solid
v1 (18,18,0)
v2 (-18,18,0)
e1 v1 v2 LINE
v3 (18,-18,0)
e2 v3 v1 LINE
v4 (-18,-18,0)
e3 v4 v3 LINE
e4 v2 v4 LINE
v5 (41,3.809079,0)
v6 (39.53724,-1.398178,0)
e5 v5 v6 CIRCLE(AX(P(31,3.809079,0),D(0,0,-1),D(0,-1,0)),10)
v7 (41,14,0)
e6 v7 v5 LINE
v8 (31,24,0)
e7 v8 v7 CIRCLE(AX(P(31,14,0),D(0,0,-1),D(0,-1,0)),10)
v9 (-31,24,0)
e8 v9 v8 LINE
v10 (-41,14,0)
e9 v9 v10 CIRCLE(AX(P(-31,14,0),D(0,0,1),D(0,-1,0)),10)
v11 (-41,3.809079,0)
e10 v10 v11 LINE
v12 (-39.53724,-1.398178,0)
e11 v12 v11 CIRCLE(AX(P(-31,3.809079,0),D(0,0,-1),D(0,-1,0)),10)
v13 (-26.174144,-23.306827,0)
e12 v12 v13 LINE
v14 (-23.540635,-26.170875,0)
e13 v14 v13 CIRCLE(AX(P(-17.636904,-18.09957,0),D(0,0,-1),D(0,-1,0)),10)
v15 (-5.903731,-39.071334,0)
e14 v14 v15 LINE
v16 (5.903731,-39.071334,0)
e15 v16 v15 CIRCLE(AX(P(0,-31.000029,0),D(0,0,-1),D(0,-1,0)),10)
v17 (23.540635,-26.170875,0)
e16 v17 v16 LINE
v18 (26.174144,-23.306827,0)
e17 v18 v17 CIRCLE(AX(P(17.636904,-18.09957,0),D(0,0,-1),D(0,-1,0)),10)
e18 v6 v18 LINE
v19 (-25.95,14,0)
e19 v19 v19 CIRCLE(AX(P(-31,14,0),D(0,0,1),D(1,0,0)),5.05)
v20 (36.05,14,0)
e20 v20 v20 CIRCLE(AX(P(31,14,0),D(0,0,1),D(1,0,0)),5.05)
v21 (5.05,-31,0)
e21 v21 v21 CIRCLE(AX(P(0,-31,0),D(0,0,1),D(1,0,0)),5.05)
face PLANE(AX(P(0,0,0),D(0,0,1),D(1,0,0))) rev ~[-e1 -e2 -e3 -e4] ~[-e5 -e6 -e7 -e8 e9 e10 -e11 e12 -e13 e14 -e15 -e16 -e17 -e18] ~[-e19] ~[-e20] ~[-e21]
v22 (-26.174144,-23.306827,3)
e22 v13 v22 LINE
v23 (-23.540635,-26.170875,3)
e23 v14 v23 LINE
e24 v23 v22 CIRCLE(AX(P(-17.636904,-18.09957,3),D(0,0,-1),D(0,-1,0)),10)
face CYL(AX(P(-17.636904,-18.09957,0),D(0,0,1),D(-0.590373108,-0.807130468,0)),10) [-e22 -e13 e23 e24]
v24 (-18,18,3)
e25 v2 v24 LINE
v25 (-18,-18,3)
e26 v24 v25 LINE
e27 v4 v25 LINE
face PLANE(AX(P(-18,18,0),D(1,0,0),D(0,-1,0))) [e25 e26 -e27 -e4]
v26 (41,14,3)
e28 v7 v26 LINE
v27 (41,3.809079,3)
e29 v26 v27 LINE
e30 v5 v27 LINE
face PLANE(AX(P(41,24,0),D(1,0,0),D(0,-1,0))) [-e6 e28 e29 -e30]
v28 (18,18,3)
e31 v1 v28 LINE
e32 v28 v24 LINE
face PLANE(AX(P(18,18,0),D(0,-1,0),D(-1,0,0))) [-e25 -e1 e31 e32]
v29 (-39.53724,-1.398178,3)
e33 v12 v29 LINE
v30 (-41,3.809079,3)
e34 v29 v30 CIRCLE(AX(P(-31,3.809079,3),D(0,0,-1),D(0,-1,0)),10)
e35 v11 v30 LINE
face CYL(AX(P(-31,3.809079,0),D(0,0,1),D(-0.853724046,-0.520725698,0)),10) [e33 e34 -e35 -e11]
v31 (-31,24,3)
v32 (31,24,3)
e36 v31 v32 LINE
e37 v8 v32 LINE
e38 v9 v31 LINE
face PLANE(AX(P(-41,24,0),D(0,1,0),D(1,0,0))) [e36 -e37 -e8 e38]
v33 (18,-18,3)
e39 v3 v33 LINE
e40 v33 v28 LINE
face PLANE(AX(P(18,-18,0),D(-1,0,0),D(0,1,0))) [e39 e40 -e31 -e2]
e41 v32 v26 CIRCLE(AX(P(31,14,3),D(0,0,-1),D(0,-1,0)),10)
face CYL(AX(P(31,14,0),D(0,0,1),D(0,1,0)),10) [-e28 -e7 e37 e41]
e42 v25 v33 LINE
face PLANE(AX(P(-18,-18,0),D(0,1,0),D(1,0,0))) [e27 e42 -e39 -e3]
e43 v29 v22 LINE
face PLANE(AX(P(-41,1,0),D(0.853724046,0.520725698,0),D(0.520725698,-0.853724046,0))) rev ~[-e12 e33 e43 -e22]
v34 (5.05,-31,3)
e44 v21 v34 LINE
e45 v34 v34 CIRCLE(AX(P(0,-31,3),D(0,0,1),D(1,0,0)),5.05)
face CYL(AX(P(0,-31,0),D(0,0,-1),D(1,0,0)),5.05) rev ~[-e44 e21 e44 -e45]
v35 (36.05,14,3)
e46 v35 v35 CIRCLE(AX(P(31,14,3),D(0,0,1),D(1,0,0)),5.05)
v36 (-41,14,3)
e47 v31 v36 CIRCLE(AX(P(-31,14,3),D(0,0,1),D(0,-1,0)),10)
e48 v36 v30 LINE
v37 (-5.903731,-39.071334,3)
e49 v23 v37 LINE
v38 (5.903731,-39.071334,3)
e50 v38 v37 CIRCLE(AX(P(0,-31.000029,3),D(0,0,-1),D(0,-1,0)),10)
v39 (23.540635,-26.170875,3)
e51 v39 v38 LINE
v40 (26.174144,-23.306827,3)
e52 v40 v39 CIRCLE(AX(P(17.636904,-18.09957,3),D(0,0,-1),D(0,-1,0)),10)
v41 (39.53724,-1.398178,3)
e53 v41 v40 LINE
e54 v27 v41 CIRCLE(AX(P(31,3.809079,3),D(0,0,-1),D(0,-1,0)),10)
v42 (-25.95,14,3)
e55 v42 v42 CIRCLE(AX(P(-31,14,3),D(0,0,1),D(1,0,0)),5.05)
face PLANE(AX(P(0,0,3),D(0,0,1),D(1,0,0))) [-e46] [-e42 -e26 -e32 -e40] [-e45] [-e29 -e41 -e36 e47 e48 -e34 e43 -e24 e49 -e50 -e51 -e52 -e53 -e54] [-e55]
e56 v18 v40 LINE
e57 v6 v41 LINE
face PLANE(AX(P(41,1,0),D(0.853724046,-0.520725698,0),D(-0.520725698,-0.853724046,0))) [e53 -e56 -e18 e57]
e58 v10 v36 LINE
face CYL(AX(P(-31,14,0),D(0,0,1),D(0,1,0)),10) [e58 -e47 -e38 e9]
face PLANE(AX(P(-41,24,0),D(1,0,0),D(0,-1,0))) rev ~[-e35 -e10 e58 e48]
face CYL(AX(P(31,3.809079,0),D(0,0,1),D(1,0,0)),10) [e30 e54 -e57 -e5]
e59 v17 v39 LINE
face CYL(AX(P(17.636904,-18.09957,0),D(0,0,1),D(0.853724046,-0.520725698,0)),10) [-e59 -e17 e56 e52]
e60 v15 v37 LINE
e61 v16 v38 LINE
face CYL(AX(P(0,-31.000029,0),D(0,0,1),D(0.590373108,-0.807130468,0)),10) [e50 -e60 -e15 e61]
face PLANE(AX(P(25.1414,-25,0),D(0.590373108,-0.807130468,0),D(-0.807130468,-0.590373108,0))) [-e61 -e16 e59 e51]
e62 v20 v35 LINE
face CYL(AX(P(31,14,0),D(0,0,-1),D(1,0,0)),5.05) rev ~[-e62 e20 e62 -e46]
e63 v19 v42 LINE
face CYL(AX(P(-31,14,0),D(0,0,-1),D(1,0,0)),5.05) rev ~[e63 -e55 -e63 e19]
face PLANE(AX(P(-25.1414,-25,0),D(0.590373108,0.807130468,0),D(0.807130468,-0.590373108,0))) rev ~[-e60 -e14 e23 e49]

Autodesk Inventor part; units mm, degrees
ref_plane "YZ Plane" through (0, 0, 0) normal (1, 0, 0) x (0, 1, 0)
ref_plane "XZ Plane" through (0, 0, 0) normal (0, 1, 0) x (-1, 0, 0)
ref_plane "XY Plane" through (0, 0, 0) normal (0, 0, 1) x (1, 0, 0)
sketch "Sketch6" plane through (0, 0, 0) normal (0, 0, 1) x (1, 0, 0)
  line L0 (18, 18) -> (-18, 18)
  line L1 (-18, 18) -> (-18, -18)
  line L2 (-18, -18) -> (18, -18)
  line L3 (18, -18) -> (18, 18)
  line L4 (18, 18) -> (-18, -18) construction
  circle A0 centre (0, -31) radius 5.05
  circle A1 centre (31, 14) radius 5.05
  circle A2 centre (-31, 14) radius 5.05
  line L5 (31, 14) -> (-31, 14) construction
  line L6 (-31, 14) -> (0, -31) construction
  line L7 (0, -31) -> (31, 14) construction
  line L8 (0, 18) -> (0, -18) construction
  line L9 (-41, 24) -> (41, 24)
  line L10 (41, 24) -> (41, 1)
  line L11 (41, 1) -> (25.1414, -25)
  line L12 (25.1414, -25) -> (0, -43.3896)
  line L13 (-41, 24) -> (-41, 1)
  line L14 (-41, 1) -> (-25.1414, -25)
  line L15 (-25.1414, -25) -> (0, -43.3896)
  point P0 (0, 0)
  point P1 (0, 0)
  point P2 (60, 0)
  dimension "d30" = 36
  dimension "d31" = 36
  dimension "d33" = 10.1
  dimension "d37" = 54.6443
  dimension "d43" = 13
  dimension "d44" = 13
  dimension "d45" = 6
  dimension "d46" = 10
  dimension "d47" = 10
  dimension "d48" = 10
  dimension "d49" = 23
  dimension "d50" = 7
  dimension "d51" = 10
extrude "Plate3" add sketch "Sketch6" along normal blind 3
fillet "Corner Round1" radius 10 7 edges at (-41, 24, 1.5) (41, 24, 1.5) (41, 1, 1.5) (25.1414, -25, 1.5) (0, -43.3896, 1.5) (-25.1414, -25, 1.5) (-41, 1, 1.5)
equation "\"d41\" = Thickness"
equation "\"BendReliefWidth\" = Thickness"
equation "\"BendReliefDepth\" = 0.5 * Thickness"
equation "\"CornerReliefSize\" = 4 * Thickness"
equation "\"MinimumRemnant\" = 2 * Thickness"
equation "\"TransitionRadius\" = BendRadius"
equation "\"JacobiRadiusSize\" = BendRadius"
equation "\"GapSize\" = Thickness"
equation "\"Thickness\" = 3"
equation "\"BendRadius\" = 5"
properties part number "MNT-CDF-504 small tube flange" material "Stainless Steel"
